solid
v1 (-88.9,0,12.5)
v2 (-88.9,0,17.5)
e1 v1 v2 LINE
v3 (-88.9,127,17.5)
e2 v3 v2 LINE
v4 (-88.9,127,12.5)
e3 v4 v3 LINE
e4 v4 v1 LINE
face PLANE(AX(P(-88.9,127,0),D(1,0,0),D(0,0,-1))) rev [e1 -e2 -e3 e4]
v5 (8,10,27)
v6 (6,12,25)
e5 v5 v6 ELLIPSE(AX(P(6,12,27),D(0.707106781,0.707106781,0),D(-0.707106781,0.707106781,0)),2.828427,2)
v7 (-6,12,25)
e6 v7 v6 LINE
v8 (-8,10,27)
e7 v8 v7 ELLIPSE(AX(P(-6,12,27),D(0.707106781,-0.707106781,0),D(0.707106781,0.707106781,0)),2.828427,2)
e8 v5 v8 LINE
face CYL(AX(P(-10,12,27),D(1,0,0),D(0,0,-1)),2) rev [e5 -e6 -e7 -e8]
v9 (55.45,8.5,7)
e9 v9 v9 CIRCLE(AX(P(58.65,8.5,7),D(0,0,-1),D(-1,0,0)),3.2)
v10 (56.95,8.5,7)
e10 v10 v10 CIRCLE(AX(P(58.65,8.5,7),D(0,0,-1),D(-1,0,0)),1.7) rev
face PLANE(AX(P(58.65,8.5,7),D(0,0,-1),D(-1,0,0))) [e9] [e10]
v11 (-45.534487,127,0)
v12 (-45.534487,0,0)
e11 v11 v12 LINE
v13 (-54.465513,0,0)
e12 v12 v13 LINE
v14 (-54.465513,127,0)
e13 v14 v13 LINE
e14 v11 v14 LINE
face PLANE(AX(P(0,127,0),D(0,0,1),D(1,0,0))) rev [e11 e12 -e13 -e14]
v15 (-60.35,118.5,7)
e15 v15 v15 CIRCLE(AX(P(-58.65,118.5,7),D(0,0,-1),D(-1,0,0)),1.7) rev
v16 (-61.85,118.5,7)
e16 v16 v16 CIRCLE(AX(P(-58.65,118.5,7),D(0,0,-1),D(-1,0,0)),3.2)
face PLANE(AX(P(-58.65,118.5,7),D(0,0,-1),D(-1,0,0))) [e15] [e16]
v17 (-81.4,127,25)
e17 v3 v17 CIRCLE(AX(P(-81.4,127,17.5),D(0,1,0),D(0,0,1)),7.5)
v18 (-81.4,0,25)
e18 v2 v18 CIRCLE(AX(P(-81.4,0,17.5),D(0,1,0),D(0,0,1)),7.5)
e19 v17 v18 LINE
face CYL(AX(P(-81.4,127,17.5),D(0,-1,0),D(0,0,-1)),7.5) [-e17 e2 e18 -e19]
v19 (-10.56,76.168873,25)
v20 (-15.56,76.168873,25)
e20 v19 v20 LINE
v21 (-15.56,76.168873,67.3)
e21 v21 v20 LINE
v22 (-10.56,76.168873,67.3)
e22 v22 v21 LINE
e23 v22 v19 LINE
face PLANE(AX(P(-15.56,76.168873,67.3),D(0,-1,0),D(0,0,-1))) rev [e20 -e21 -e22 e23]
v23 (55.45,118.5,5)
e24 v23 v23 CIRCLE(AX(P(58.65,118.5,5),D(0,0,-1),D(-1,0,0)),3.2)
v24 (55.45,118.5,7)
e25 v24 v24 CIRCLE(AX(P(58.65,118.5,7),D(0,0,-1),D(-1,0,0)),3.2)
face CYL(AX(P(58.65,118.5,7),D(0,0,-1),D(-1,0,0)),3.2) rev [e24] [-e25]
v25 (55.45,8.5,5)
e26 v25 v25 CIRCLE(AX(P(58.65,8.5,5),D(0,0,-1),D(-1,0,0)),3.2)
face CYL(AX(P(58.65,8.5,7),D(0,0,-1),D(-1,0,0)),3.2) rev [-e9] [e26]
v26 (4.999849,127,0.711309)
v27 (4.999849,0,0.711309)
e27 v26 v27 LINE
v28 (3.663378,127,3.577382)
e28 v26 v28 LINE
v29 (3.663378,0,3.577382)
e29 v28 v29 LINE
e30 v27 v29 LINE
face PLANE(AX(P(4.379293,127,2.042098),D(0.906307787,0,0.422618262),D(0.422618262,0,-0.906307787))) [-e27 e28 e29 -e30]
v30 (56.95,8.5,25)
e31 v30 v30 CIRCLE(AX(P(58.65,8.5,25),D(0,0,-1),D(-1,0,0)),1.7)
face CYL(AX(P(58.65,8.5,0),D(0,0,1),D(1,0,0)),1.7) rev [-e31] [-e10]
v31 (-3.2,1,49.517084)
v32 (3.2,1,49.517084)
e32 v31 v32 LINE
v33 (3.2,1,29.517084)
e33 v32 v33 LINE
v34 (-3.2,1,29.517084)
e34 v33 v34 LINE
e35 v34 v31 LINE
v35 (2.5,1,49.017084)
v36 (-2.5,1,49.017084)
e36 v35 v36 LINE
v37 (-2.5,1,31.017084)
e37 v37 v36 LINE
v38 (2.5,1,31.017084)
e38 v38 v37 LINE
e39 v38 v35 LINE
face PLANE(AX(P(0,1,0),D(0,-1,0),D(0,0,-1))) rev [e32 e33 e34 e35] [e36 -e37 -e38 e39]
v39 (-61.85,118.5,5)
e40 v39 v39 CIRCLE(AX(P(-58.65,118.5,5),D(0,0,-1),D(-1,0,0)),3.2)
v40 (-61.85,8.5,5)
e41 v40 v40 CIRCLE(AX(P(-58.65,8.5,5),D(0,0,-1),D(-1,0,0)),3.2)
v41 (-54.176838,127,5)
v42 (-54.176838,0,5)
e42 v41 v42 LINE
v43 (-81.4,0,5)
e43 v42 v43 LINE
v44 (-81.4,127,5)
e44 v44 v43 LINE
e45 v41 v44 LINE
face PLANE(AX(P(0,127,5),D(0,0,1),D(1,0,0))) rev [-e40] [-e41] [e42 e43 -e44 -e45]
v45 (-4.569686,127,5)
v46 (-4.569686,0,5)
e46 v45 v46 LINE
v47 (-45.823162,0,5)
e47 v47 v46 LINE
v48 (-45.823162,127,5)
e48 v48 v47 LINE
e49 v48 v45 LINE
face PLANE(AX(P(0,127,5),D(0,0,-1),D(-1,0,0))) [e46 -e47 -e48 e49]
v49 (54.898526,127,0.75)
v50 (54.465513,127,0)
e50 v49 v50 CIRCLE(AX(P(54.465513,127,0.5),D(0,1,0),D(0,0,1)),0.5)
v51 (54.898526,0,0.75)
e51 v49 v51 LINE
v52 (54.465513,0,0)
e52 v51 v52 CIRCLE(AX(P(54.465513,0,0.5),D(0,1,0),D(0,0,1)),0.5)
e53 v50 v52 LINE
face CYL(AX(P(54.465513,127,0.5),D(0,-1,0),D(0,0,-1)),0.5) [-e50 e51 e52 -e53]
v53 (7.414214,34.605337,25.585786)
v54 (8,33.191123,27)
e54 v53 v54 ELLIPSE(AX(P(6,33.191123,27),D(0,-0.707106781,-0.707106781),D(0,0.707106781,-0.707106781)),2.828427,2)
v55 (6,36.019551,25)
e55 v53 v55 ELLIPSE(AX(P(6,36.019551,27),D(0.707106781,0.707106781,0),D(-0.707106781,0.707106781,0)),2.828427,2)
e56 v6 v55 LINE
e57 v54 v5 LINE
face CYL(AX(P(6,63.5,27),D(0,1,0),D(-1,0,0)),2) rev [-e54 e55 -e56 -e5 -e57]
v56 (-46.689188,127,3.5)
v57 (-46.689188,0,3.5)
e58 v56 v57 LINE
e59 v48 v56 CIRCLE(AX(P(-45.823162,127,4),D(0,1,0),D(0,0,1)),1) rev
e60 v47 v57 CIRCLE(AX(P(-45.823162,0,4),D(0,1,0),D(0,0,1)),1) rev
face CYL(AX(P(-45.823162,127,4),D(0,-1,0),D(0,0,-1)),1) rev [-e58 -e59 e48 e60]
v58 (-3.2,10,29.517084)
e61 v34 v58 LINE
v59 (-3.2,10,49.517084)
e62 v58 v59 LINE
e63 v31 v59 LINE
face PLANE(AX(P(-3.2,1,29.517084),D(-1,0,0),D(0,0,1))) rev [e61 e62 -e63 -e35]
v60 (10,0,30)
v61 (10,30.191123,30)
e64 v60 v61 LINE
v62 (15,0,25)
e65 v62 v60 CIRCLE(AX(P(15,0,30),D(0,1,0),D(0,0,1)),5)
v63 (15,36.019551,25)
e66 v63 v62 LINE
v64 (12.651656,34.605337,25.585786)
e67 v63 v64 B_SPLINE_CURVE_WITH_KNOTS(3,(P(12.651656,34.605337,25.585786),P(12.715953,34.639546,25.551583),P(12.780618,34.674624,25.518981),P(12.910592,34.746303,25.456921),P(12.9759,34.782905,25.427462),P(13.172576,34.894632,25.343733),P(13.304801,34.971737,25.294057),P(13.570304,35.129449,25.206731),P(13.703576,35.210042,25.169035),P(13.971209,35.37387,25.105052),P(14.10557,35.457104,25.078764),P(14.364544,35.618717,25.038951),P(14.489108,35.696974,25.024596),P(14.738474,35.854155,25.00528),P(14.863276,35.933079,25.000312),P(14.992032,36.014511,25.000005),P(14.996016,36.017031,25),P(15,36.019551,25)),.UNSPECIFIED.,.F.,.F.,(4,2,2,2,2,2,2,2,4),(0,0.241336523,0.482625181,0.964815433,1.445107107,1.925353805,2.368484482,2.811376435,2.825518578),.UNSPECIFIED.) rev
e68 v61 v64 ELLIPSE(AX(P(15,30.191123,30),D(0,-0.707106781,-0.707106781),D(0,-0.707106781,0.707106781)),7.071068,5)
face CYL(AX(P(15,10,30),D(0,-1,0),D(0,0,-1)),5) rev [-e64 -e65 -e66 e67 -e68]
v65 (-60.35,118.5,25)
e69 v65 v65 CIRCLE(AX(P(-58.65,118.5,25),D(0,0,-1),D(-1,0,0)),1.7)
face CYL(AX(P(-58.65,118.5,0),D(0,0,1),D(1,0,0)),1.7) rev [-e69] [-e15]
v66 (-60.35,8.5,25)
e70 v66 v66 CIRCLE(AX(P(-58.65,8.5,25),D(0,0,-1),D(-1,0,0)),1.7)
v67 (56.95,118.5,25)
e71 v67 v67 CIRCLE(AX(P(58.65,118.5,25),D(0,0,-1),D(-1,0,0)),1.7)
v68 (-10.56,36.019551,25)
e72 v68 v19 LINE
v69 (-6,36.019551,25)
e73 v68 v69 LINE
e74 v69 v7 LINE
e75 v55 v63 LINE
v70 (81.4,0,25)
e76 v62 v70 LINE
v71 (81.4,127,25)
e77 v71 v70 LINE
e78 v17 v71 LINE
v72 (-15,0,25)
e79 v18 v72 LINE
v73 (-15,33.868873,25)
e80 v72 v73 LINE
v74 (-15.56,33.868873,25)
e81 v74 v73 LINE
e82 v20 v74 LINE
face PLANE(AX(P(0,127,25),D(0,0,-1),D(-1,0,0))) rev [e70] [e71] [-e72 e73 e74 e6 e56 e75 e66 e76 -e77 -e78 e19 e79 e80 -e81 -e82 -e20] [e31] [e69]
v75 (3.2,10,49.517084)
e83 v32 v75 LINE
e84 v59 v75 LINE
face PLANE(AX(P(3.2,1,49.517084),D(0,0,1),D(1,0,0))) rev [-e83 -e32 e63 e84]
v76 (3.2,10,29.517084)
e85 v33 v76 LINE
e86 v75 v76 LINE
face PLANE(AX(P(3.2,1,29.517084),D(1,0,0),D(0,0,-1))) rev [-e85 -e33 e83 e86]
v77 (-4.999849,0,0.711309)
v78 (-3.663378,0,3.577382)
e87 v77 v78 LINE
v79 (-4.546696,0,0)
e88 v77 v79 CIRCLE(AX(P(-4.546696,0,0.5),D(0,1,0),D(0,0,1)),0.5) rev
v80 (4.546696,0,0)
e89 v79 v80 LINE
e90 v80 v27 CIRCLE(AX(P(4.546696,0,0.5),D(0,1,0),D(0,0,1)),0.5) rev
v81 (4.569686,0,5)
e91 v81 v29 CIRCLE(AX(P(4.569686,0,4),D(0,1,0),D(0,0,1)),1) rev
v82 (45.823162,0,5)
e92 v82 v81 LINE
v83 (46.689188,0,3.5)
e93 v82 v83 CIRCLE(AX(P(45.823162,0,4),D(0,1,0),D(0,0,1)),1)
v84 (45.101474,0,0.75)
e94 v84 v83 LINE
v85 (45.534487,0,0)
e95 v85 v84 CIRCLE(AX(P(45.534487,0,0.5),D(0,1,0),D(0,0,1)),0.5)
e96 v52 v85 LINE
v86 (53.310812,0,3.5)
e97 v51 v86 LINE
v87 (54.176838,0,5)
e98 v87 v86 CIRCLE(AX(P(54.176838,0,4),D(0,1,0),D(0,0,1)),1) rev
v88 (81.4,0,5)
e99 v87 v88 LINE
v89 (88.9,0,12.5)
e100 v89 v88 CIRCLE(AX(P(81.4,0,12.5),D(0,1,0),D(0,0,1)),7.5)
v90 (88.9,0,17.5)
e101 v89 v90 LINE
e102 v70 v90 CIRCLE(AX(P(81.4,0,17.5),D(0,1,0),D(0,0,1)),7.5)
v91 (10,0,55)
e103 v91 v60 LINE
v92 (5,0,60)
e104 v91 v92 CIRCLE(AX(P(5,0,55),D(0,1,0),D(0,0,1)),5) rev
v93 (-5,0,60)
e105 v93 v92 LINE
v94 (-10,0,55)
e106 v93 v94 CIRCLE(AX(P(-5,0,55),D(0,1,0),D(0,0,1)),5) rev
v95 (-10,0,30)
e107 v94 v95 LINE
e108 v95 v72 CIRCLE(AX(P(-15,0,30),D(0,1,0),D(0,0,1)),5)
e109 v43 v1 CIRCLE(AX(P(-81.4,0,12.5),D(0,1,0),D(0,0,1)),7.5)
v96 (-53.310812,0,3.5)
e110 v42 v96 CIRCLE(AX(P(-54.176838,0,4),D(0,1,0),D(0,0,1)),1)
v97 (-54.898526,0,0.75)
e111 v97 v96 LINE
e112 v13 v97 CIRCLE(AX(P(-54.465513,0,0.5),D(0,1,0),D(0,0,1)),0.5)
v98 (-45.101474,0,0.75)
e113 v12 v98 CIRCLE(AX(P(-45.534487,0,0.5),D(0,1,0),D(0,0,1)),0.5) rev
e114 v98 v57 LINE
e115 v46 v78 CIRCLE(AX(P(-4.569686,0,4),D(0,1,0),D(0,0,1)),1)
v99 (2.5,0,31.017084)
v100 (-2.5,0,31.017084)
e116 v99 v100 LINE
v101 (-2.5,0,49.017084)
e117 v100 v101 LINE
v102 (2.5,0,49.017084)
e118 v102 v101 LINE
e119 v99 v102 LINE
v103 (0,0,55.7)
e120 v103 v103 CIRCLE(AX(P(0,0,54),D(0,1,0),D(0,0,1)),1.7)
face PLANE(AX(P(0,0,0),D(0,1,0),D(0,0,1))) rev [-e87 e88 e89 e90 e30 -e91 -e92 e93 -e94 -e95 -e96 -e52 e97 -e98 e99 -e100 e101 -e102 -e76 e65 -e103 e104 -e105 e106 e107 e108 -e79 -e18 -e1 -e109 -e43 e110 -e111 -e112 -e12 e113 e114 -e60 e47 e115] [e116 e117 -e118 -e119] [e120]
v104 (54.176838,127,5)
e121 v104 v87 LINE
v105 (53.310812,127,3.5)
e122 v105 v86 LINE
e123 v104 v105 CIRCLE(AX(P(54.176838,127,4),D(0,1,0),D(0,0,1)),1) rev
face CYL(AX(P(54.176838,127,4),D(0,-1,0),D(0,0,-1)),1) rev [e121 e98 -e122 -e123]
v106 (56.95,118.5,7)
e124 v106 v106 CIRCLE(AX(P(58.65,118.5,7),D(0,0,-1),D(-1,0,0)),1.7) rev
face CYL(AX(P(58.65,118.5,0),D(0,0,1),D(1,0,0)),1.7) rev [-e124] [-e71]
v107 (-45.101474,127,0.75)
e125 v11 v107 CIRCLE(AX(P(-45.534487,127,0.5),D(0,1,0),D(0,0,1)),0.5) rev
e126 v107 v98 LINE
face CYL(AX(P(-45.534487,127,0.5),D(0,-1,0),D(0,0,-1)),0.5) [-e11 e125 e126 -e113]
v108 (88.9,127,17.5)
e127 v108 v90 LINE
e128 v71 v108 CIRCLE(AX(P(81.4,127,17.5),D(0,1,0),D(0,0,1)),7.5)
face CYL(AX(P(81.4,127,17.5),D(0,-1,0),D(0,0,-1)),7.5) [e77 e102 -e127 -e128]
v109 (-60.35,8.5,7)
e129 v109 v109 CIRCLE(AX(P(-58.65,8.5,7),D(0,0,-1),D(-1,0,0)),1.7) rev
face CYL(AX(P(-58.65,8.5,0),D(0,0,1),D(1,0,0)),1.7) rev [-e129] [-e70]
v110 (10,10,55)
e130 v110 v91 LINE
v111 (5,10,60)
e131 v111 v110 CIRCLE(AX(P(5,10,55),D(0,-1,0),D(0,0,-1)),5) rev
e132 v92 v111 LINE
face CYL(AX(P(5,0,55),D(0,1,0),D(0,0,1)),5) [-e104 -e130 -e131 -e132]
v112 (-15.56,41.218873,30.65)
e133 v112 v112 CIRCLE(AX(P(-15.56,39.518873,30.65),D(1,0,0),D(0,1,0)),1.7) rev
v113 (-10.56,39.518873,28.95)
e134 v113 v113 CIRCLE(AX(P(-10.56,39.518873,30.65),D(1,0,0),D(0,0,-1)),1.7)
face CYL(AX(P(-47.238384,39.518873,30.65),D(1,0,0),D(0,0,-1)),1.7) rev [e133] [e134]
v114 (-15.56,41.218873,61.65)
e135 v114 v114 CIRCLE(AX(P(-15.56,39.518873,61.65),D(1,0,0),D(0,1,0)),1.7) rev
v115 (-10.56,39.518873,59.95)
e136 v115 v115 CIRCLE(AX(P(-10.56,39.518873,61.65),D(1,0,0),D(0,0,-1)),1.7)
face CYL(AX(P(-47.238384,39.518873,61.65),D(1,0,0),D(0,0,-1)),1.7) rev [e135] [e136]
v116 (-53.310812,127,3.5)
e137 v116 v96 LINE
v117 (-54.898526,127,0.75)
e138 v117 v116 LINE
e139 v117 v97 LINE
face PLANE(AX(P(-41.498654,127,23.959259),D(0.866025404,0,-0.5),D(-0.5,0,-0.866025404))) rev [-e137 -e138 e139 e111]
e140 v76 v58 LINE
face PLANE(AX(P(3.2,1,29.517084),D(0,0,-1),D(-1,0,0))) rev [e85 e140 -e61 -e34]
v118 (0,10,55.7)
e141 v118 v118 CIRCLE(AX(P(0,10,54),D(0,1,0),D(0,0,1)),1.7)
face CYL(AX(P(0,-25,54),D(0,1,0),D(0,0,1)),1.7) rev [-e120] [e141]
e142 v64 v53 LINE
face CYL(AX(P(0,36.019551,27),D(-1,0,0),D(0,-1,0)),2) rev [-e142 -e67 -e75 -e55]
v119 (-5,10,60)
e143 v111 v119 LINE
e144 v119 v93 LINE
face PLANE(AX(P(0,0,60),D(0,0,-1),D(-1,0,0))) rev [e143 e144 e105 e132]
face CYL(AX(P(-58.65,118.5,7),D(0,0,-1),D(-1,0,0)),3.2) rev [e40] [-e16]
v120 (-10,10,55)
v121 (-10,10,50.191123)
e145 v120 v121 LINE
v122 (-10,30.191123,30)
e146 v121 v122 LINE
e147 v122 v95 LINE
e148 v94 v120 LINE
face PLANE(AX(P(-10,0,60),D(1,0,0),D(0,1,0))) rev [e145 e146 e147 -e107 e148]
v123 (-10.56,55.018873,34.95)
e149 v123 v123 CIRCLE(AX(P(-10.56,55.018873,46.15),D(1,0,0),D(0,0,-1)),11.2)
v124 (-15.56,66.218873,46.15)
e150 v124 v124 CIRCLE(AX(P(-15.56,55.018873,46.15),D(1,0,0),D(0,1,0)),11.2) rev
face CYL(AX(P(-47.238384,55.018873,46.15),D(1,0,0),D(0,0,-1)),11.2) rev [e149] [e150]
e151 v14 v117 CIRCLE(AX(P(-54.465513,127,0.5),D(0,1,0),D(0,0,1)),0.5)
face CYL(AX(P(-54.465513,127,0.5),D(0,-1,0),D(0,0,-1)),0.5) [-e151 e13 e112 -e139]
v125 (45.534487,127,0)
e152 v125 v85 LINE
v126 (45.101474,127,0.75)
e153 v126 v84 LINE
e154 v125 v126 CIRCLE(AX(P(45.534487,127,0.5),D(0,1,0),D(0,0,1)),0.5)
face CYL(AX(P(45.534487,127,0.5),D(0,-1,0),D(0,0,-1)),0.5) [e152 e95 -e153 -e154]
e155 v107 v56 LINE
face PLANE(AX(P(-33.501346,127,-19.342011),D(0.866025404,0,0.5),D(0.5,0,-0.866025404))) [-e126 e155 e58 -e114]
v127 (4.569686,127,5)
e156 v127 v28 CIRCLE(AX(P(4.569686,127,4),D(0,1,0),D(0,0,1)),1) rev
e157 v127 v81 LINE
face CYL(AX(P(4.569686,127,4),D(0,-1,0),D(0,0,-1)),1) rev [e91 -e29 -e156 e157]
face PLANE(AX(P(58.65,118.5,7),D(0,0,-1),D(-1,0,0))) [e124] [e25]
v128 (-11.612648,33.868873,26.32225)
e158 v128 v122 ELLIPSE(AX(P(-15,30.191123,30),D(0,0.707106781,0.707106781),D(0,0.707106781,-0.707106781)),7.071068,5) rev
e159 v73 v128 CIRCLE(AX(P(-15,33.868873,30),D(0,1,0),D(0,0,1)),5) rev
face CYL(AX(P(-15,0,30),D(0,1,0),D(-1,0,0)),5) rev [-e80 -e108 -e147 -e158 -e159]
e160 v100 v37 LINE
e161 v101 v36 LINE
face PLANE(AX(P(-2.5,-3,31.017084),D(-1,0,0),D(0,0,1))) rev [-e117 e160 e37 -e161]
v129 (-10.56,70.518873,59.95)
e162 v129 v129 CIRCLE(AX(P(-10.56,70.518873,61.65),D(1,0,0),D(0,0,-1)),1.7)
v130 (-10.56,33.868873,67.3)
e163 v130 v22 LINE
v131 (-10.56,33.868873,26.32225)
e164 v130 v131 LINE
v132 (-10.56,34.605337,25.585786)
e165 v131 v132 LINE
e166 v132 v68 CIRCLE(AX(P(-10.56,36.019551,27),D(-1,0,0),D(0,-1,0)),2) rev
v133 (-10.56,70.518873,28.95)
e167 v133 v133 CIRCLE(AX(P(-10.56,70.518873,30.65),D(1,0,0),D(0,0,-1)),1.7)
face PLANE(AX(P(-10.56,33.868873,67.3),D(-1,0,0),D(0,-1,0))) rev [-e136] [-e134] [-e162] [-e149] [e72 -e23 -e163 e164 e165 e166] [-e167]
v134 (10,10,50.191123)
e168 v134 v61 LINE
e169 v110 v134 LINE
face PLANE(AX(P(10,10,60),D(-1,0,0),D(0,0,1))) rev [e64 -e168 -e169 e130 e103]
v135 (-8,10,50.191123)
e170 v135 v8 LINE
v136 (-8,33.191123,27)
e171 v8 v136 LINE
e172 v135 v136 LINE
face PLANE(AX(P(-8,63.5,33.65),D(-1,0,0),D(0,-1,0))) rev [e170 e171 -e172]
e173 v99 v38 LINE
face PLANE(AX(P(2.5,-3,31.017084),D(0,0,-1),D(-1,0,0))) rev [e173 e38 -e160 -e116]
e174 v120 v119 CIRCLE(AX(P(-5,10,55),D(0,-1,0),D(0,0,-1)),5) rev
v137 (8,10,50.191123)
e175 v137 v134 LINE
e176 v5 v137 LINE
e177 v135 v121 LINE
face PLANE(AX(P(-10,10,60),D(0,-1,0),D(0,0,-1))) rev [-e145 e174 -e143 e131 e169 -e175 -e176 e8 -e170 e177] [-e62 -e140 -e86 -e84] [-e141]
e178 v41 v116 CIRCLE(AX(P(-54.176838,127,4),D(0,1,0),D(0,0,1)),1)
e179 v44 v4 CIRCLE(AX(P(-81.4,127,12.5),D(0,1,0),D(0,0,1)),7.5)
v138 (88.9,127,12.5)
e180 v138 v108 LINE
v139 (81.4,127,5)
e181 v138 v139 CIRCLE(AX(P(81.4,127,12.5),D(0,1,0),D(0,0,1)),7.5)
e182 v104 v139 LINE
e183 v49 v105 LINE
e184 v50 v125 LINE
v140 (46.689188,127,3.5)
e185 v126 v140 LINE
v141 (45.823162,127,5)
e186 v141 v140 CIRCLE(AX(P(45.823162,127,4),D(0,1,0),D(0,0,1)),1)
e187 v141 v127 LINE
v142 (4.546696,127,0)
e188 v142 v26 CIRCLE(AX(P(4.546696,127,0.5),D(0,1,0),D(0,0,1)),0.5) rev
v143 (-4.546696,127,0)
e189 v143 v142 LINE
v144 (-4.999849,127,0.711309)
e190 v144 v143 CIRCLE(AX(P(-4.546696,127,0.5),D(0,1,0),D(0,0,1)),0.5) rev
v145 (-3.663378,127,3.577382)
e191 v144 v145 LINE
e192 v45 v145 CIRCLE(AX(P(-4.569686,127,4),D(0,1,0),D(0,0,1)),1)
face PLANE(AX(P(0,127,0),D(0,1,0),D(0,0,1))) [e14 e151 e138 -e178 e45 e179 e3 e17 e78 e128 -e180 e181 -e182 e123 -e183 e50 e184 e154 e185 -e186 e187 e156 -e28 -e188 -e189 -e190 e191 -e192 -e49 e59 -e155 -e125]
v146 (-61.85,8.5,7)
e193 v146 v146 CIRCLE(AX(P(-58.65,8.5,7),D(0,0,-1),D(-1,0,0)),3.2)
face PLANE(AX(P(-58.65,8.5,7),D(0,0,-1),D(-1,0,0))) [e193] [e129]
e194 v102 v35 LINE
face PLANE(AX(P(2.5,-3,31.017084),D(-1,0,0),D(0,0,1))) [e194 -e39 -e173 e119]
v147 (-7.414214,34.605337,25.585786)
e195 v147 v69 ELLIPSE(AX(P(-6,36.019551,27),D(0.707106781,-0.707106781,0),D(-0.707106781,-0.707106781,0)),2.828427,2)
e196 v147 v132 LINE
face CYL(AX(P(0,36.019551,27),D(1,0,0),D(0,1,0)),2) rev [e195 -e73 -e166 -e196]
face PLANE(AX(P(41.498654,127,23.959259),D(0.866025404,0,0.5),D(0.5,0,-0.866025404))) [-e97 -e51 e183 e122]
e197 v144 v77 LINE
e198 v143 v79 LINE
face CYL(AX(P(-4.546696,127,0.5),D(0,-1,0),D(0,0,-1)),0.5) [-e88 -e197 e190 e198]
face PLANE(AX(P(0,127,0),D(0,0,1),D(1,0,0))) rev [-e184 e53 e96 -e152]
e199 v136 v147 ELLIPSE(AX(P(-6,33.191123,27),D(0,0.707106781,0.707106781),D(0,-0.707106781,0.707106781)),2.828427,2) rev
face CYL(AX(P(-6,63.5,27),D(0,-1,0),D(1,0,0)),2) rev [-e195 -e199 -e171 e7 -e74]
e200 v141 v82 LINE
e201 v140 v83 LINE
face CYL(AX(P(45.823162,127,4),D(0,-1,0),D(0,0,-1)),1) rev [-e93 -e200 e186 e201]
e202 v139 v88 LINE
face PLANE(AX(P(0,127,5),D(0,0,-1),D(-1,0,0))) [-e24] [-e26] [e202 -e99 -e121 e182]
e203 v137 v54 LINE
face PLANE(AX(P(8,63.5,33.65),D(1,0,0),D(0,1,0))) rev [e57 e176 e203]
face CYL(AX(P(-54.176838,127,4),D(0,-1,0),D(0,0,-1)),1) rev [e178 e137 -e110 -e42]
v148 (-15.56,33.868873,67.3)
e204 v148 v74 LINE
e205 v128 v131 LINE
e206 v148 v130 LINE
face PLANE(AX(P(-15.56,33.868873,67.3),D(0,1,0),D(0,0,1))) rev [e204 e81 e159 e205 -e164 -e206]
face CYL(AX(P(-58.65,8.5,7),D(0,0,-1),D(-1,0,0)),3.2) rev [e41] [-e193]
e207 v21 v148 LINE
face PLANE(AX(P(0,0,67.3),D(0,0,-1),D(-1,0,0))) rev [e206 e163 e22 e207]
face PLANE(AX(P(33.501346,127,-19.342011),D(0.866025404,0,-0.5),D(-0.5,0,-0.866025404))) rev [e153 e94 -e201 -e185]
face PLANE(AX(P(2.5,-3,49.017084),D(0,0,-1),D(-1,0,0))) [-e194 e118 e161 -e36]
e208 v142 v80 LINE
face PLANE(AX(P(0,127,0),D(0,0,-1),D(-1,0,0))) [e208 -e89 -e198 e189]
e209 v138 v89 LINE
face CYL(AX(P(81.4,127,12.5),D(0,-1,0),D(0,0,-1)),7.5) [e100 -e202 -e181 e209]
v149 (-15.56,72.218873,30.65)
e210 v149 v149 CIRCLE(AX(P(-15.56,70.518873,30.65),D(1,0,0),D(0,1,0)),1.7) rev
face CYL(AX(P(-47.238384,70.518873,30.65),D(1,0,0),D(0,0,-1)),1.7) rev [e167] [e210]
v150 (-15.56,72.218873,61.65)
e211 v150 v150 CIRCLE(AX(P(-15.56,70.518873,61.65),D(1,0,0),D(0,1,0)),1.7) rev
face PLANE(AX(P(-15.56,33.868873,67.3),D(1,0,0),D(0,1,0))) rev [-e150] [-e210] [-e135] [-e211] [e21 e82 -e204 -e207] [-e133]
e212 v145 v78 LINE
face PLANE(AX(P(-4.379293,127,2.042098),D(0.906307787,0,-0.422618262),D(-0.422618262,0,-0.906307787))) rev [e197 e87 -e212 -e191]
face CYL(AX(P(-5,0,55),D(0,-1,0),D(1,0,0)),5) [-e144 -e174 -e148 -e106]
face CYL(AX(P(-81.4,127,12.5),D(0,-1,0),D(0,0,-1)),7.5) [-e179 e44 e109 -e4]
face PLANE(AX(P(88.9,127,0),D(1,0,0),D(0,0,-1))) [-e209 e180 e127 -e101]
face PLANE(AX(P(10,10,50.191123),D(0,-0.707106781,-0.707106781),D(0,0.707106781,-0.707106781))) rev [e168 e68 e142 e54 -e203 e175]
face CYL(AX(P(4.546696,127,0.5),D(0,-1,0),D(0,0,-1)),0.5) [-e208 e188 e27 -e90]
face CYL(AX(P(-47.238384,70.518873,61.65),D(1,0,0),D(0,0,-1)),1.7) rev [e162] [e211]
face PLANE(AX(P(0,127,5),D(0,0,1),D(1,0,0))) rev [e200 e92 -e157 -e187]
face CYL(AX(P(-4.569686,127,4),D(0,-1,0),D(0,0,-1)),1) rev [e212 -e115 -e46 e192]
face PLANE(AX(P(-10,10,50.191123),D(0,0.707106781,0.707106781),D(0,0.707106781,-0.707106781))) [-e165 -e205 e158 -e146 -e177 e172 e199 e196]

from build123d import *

# Parameters (mm, degrees)
BOSS_EXTRUDE1_DEPTH     = 127
SKETCH3_W               = 5
SKETCH3_H               = 42.3
BOSS_EXTRUDE2_DEPTH     = 42.3
SKETCH4_R               = 1.7
CUT_EXTRUDE1_DEPTH      = 5
CUT_EXTRUDE7_DEPTH      = 161.690696682
CUT_EXTRUDE7_DEPTH_BACK = 161.690696682
SKETCH5_R               = 1.7
SKETCH8_R               = 3.2
CUT_EXTRUDE8_DEPTH      = 2
SKETCH10_W              = 20
SKETCH10_H              = 10
BOSS_EXTRUDE3_DEPTH     = 35
FILLET3_R               = 5
SKETCH12_R              = 1.7
CUT_EXTRUDE9_DEPTH      = 35
RIB47_START             = -2
RIB47_DEPTH             = 2
FILLET7_R               = 5
FILLET8_R               = 2
SKETCH18_W              = 6.4
SKETCH18_H              = 20
CUT_EXTRUDE10_DEPTH     = 9
SKETCH19_W              = 5
SKETCH19_H              = 18
CUT_EXTRUDE11_DEPTH     = 4


# Read off the part's stored shape, not the designer's step: Rib47
with BuildPart() as part:
    # Sketch2 → Boss-Extrude1 (new body)
    with BuildSketch(Plane(origin=(0, 0, 0), x_dir=(1, 0, 0), z_dir=(0, 1, 0))):
        with BuildLine():
            ThreePointArc((-4.546695502, 0), (-4.968391225, -0.231350196), (-4.999849396, -0.711309131))
            Line((-4.999849396, -0.711309131), (-3.66337779, -3.577381738))
            ThreePointArc((-3.66337779, -3.577381738), (-3.726294131, -4.537299608), (-4.569685577, -5))
            Line((-4.569685577, -5), (-45.823162248, -5))
            ThreePointArc((-45.823162248, -5), (-46.689187651, -4.5), (-46.689187651, -3.5))
            Line((-46.689187651, -3.5), (-45.101474411, -0.75))
            ThreePointArc((-45.101474411, -0.75), (-45.101474411, -0.25), (-45.534487113, 0))
            Line((-45.534487113, 0), (-54.465512887, 0))
            ThreePointArc((-54.465512887, 0), (-54.898525589, -0.25), (-54.898525589, -0.75))
            Line((-54.898525589, -0.75), (-53.310812349, -3.5))
            ThreePointArc((-53.310812349, -3.5), (-53.310812349, -4.5), (-54.176837752, -5))
            Line((-54.176837752, -5), (-81.4, -5))
            ThreePointArc((-81.4, -5), (-86.703300859, -7.196699141), (-88.9, -12.5))
            Line((-88.9, -12.5), (-88.9, -17.5))
            ThreePointArc((-88.9, -17.5), (-86.703300859, -22.803300859), (-81.4, -25))
            Line((-81.4, -25), (81.4, -25))
            ThreePointArc((81.4, -25), (86.703300859, -22.803300859), (88.9, -17.5))
            Line((88.9, -17.5), (88.9, -12.5))
            ThreePointArc((88.9, -12.5), (86.703300859, -7.196699141), (81.4, -5))
            Line((81.4, -5), (54.176837752, -5))
            ThreePointArc((54.176837752, -5), (53.310812349, -4.5), (53.310812349, -3.5))
            Line((53.310812349, -3.5), (54.898525589, -0.75))
            ThreePointArc((54.898525589, -0.75), (54.898525589, -0.25), (54.465512887, 0))
            Line((54.465512887, 0), (45.534487113, 0))
            ThreePointArc((45.534487113, 0), (45.101474411, -0.25), (45.101474411, -0.75))
            Line((45.101474411, -0.75), (46.689187651, -3.5))
            ThreePointArc((46.689187651, -3.5), (46.689187651, -4.5), (45.823162248, -5))
            Line((45.823162248, -5), (4.569685577, -5))
            ThreePointArc((4.569685577, -5), (3.726294131, -4.537299608), (3.66337779, -3.577381738))
            Line((3.66337779, -3.577381738), (4.999849396, -0.711309131))
            ThreePointArc((4.999849396, -0.711309131), (4.968391225, -0.231350196), (4.546695502, 0))
            Line((4.546695502, 0), (-4.546695502, 0))
        make_face()
    extrude(amount=BOSS_EXTRUDE1_DEPTH)

    # Sketch3 → Boss-Extrude2 (add)
    with BuildSketch(Plane.XY.offset(25)):
        with Locations((-13.06, 55.018873206)):
            Rectangle(SKETCH3_W, SKETCH3_H)
    extrude(amount=BOSS_EXTRUDE2_DEPTH)

    # Sketch4 → Cut-Extrude1 (cut)
    with BuildSketch(Plane(origin=(-10.56, 0, 0), x_dir=(0, 0, -1), z_dir=(1, 0, 0))):
        with BuildLine():
            ThreePointArc((-34.95, 55.018873206), (-46.15, 66.218873206), (-57.35, 55.018873206))
            Line((-57.35, 55.018873206), (-34.95, 55.018873206))
        make_face()
        with BuildLine():
            Line((-34.95, 55.018873206), (-57.35, 55.018873206))
            ThreePointArc((-57.35, 55.018873206), (-46.15, 43.818873206), (-34.95, 55.018873206))
        make_face()
        with Locations((-61.65, 70.518873206)):
            Circle(SKETCH4_R)
        with Locations((-30.65, 70.518873206)):
            Circle(SKETCH4_R)
        with Locations((-30.65, 39.518873206)):
            Circle(SKETCH4_R)
        with Locations((-61.65, 39.518873206)):
            Circle(SKETCH4_R)
    extrude(amount=-CUT_EXTRUDE1_DEPTH, mode=Mode.SUBTRACT)

    # Sketch5 → Cut-Extrude7 (cut, two sides: drawn at the far end of the back side and taken through both)
    with BuildSketch(Plane.XY.offset(25).offset(-CUT_EXTRUDE7_DEPTH_BACK)):
        with Locations((-58.65, 118.5)):
            Circle(SKETCH5_R)
        with Locations(Location((58.65, 118.5, 0), (0, 0, 180))):
            Circle(SKETCH5_R)
        with Locations(Location((58.65, 8.5, 0), (0, 0, 180))):
            Circle(SKETCH5_R)
        with Locations((-58.65, 8.5)):
            Circle(SKETCH5_R)
    extrude(amount=CUT_EXTRUDE7_DEPTH + CUT_EXTRUDE7_DEPTH_BACK, mode=Mode.SUBTRACT)

    # Sketch8 → Cut-Extrude8 (cut)
    with BuildSketch(Plane(origin=(0, 0, 5), x_dir=(-1, 0, 0), z_dir=(0, 0, -1))):
        with Locations((-58.65, 118.5)):
            Circle(SKETCH8_R)
        with Locations((-58.65, 8.5)):
            Circle(SKETCH8_R)
        with Locations((58.65, 118.5)):
            Circle(SKETCH8_R)
        with Locations((58.65, 8.5)):
            Circle(SKETCH8_R)
    extrude(amount=-CUT_EXTRUDE8_DEPTH, mode=Mode.SUBTRACT)

    # Sketch10 → Boss-Extrude3 (add)
    with BuildSketch(Plane.XY.offset(25)):
        with Locations((0, 5)):
            Rectangle(SKETCH10_W, SKETCH10_H)
    extrude(amount=BOSS_EXTRUDE3_DEPTH)

    # Fillet3
    fillet3_edges = [part.edges().sort_by_distance(p)[0] for p in [
        (-10, 5, 60),
        (10, 5, 60),
    ]]
    fillet(fillet3_edges, radius=FILLET3_R)

    # Sketch12 → Cut-Extrude9 (cut)
    with BuildSketch(Plane(origin=(0, 10, 0), x_dir=(1, 0, 0), z_dir=(0, 1, 0))):
        with Locations(Location((0, -54, 0), (0, 0, 270))):
            Circle(SKETCH12_R)
    extrude(amount=-CUT_EXTRUDE9_DEPTH, mode=Mode.SUBTRACT)

    # Rib47 outline → Rib47 (add)
    with BuildSketch(Plane(origin=(10, 0, 0), x_dir=(0, 0, -1), z_dir=(1, 0, 0)).offset(RIB47_START)):
        Polygon((-25, 35.191123447), (-50.191123447, 10), (-25, 10), align=None)
    rib47 = extrude(amount=RIB47_DEPTH)

    # Mirror1: Rib47 across plane
    add(rib47.mirror(Plane(origin=(0, 0, 0), x_dir=(0, 0, 1), z_dir=(1, 0, 0))))

    # Fillet7
    # the kernel refuses this fillet: 5 mm, written as the material it adds along each edge
    with BuildSketch(Plane(origin=(-10, 47.691123447, 25), x_dir=(-1, 0, 0), z_dir=(0, -1, 0))) as fillet7_piece_1_section:
        with BuildLine():
            CenterArc((FILLET7_R, -FILLET7_R), FILLET7_R, 90, 90)
            Line((0, -FILLET7_R), (0, 0))
            Line((0, 0), (FILLET7_R, 0))
        make_face()
    fillet7_piece_1 = extrude(amount=47.691123447, mode=Mode.PRIVATE)
    fillet7_piece_1 = split(fillet7_piece_1, bisect_by=Plane(origin=(-11.152129269, 25.569946894, 34.621176553), z_dir=(0, -0.7071067811865476, -0.7071067811865476)), keep=Keep.TOP, mode=Mode.PRIVATE)
    add(fillet7_piece_1)
    with BuildSketch(Plane(origin=(10, 47.691123447, 25), x_dir=(0, 0, 1), z_dir=(0, -1, 0))) as fillet7_piece_2_section:
        with BuildLine():
            CenterArc((FILLET7_R, -FILLET7_R), FILLET7_R, 90, 90)
            Line((0, -FILLET7_R), (0, 0))
            Line((0, 0), (FILLET7_R, 0))
        make_face()
    fillet7_piece_2 = extrude(amount=47.691123447, mode=Mode.PRIVATE)
    fillet7_piece_2 = split(fillet7_piece_2, bisect_by=Plane(origin=(11.152129269, 25.569946894, 34.621176553), z_dir=(0, -0.7071067811865476, -0.7071067811865476)), keep=Keep.TOP, mode=Mode.PRIVATE)
    add(fillet7_piece_2)

    # Fillet8
    fillet8_edges = [part.edges().sort_by_distance(p)[0] for p in [
        (0, 10, 25),
        (8, 22.595561724, 25),
        (11.5, 35.191123447, 25),
        (-9.28, 35.191123447, 25),
        (-8, 22.595561724, 25),
    ]]
    fillet(fillet8_edges, radius=FILLET8_R)

    # Sketch18 → Cut-Extrude10 (cut)
    with BuildSketch(Plane(origin=(0, 10, 0), x_dir=(1, 0, 0), z_dir=(0, 1, 0))):
        with Locations((0, -39.517084206)):
            Rectangle(SKETCH18_W, SKETCH18_H)
    extrude(amount=-CUT_EXTRUDE10_DEPTH, mode=Mode.SUBTRACT)

    # Sketch19 → Cut-Extrude11 (cut)
    with BuildSketch(Plane(origin=(0, 1, 0), x_dir=(1, 0, 0), z_dir=(0, 1, 0))):
        with Locations((0, -40.017084206)):
            Rectangle(SKETCH19_W, SKETCH19_H)
    extrude(amount=-CUT_EXTRUDE11_DEPTH, mode=Mode.SUBTRACT)


solid = part.part
